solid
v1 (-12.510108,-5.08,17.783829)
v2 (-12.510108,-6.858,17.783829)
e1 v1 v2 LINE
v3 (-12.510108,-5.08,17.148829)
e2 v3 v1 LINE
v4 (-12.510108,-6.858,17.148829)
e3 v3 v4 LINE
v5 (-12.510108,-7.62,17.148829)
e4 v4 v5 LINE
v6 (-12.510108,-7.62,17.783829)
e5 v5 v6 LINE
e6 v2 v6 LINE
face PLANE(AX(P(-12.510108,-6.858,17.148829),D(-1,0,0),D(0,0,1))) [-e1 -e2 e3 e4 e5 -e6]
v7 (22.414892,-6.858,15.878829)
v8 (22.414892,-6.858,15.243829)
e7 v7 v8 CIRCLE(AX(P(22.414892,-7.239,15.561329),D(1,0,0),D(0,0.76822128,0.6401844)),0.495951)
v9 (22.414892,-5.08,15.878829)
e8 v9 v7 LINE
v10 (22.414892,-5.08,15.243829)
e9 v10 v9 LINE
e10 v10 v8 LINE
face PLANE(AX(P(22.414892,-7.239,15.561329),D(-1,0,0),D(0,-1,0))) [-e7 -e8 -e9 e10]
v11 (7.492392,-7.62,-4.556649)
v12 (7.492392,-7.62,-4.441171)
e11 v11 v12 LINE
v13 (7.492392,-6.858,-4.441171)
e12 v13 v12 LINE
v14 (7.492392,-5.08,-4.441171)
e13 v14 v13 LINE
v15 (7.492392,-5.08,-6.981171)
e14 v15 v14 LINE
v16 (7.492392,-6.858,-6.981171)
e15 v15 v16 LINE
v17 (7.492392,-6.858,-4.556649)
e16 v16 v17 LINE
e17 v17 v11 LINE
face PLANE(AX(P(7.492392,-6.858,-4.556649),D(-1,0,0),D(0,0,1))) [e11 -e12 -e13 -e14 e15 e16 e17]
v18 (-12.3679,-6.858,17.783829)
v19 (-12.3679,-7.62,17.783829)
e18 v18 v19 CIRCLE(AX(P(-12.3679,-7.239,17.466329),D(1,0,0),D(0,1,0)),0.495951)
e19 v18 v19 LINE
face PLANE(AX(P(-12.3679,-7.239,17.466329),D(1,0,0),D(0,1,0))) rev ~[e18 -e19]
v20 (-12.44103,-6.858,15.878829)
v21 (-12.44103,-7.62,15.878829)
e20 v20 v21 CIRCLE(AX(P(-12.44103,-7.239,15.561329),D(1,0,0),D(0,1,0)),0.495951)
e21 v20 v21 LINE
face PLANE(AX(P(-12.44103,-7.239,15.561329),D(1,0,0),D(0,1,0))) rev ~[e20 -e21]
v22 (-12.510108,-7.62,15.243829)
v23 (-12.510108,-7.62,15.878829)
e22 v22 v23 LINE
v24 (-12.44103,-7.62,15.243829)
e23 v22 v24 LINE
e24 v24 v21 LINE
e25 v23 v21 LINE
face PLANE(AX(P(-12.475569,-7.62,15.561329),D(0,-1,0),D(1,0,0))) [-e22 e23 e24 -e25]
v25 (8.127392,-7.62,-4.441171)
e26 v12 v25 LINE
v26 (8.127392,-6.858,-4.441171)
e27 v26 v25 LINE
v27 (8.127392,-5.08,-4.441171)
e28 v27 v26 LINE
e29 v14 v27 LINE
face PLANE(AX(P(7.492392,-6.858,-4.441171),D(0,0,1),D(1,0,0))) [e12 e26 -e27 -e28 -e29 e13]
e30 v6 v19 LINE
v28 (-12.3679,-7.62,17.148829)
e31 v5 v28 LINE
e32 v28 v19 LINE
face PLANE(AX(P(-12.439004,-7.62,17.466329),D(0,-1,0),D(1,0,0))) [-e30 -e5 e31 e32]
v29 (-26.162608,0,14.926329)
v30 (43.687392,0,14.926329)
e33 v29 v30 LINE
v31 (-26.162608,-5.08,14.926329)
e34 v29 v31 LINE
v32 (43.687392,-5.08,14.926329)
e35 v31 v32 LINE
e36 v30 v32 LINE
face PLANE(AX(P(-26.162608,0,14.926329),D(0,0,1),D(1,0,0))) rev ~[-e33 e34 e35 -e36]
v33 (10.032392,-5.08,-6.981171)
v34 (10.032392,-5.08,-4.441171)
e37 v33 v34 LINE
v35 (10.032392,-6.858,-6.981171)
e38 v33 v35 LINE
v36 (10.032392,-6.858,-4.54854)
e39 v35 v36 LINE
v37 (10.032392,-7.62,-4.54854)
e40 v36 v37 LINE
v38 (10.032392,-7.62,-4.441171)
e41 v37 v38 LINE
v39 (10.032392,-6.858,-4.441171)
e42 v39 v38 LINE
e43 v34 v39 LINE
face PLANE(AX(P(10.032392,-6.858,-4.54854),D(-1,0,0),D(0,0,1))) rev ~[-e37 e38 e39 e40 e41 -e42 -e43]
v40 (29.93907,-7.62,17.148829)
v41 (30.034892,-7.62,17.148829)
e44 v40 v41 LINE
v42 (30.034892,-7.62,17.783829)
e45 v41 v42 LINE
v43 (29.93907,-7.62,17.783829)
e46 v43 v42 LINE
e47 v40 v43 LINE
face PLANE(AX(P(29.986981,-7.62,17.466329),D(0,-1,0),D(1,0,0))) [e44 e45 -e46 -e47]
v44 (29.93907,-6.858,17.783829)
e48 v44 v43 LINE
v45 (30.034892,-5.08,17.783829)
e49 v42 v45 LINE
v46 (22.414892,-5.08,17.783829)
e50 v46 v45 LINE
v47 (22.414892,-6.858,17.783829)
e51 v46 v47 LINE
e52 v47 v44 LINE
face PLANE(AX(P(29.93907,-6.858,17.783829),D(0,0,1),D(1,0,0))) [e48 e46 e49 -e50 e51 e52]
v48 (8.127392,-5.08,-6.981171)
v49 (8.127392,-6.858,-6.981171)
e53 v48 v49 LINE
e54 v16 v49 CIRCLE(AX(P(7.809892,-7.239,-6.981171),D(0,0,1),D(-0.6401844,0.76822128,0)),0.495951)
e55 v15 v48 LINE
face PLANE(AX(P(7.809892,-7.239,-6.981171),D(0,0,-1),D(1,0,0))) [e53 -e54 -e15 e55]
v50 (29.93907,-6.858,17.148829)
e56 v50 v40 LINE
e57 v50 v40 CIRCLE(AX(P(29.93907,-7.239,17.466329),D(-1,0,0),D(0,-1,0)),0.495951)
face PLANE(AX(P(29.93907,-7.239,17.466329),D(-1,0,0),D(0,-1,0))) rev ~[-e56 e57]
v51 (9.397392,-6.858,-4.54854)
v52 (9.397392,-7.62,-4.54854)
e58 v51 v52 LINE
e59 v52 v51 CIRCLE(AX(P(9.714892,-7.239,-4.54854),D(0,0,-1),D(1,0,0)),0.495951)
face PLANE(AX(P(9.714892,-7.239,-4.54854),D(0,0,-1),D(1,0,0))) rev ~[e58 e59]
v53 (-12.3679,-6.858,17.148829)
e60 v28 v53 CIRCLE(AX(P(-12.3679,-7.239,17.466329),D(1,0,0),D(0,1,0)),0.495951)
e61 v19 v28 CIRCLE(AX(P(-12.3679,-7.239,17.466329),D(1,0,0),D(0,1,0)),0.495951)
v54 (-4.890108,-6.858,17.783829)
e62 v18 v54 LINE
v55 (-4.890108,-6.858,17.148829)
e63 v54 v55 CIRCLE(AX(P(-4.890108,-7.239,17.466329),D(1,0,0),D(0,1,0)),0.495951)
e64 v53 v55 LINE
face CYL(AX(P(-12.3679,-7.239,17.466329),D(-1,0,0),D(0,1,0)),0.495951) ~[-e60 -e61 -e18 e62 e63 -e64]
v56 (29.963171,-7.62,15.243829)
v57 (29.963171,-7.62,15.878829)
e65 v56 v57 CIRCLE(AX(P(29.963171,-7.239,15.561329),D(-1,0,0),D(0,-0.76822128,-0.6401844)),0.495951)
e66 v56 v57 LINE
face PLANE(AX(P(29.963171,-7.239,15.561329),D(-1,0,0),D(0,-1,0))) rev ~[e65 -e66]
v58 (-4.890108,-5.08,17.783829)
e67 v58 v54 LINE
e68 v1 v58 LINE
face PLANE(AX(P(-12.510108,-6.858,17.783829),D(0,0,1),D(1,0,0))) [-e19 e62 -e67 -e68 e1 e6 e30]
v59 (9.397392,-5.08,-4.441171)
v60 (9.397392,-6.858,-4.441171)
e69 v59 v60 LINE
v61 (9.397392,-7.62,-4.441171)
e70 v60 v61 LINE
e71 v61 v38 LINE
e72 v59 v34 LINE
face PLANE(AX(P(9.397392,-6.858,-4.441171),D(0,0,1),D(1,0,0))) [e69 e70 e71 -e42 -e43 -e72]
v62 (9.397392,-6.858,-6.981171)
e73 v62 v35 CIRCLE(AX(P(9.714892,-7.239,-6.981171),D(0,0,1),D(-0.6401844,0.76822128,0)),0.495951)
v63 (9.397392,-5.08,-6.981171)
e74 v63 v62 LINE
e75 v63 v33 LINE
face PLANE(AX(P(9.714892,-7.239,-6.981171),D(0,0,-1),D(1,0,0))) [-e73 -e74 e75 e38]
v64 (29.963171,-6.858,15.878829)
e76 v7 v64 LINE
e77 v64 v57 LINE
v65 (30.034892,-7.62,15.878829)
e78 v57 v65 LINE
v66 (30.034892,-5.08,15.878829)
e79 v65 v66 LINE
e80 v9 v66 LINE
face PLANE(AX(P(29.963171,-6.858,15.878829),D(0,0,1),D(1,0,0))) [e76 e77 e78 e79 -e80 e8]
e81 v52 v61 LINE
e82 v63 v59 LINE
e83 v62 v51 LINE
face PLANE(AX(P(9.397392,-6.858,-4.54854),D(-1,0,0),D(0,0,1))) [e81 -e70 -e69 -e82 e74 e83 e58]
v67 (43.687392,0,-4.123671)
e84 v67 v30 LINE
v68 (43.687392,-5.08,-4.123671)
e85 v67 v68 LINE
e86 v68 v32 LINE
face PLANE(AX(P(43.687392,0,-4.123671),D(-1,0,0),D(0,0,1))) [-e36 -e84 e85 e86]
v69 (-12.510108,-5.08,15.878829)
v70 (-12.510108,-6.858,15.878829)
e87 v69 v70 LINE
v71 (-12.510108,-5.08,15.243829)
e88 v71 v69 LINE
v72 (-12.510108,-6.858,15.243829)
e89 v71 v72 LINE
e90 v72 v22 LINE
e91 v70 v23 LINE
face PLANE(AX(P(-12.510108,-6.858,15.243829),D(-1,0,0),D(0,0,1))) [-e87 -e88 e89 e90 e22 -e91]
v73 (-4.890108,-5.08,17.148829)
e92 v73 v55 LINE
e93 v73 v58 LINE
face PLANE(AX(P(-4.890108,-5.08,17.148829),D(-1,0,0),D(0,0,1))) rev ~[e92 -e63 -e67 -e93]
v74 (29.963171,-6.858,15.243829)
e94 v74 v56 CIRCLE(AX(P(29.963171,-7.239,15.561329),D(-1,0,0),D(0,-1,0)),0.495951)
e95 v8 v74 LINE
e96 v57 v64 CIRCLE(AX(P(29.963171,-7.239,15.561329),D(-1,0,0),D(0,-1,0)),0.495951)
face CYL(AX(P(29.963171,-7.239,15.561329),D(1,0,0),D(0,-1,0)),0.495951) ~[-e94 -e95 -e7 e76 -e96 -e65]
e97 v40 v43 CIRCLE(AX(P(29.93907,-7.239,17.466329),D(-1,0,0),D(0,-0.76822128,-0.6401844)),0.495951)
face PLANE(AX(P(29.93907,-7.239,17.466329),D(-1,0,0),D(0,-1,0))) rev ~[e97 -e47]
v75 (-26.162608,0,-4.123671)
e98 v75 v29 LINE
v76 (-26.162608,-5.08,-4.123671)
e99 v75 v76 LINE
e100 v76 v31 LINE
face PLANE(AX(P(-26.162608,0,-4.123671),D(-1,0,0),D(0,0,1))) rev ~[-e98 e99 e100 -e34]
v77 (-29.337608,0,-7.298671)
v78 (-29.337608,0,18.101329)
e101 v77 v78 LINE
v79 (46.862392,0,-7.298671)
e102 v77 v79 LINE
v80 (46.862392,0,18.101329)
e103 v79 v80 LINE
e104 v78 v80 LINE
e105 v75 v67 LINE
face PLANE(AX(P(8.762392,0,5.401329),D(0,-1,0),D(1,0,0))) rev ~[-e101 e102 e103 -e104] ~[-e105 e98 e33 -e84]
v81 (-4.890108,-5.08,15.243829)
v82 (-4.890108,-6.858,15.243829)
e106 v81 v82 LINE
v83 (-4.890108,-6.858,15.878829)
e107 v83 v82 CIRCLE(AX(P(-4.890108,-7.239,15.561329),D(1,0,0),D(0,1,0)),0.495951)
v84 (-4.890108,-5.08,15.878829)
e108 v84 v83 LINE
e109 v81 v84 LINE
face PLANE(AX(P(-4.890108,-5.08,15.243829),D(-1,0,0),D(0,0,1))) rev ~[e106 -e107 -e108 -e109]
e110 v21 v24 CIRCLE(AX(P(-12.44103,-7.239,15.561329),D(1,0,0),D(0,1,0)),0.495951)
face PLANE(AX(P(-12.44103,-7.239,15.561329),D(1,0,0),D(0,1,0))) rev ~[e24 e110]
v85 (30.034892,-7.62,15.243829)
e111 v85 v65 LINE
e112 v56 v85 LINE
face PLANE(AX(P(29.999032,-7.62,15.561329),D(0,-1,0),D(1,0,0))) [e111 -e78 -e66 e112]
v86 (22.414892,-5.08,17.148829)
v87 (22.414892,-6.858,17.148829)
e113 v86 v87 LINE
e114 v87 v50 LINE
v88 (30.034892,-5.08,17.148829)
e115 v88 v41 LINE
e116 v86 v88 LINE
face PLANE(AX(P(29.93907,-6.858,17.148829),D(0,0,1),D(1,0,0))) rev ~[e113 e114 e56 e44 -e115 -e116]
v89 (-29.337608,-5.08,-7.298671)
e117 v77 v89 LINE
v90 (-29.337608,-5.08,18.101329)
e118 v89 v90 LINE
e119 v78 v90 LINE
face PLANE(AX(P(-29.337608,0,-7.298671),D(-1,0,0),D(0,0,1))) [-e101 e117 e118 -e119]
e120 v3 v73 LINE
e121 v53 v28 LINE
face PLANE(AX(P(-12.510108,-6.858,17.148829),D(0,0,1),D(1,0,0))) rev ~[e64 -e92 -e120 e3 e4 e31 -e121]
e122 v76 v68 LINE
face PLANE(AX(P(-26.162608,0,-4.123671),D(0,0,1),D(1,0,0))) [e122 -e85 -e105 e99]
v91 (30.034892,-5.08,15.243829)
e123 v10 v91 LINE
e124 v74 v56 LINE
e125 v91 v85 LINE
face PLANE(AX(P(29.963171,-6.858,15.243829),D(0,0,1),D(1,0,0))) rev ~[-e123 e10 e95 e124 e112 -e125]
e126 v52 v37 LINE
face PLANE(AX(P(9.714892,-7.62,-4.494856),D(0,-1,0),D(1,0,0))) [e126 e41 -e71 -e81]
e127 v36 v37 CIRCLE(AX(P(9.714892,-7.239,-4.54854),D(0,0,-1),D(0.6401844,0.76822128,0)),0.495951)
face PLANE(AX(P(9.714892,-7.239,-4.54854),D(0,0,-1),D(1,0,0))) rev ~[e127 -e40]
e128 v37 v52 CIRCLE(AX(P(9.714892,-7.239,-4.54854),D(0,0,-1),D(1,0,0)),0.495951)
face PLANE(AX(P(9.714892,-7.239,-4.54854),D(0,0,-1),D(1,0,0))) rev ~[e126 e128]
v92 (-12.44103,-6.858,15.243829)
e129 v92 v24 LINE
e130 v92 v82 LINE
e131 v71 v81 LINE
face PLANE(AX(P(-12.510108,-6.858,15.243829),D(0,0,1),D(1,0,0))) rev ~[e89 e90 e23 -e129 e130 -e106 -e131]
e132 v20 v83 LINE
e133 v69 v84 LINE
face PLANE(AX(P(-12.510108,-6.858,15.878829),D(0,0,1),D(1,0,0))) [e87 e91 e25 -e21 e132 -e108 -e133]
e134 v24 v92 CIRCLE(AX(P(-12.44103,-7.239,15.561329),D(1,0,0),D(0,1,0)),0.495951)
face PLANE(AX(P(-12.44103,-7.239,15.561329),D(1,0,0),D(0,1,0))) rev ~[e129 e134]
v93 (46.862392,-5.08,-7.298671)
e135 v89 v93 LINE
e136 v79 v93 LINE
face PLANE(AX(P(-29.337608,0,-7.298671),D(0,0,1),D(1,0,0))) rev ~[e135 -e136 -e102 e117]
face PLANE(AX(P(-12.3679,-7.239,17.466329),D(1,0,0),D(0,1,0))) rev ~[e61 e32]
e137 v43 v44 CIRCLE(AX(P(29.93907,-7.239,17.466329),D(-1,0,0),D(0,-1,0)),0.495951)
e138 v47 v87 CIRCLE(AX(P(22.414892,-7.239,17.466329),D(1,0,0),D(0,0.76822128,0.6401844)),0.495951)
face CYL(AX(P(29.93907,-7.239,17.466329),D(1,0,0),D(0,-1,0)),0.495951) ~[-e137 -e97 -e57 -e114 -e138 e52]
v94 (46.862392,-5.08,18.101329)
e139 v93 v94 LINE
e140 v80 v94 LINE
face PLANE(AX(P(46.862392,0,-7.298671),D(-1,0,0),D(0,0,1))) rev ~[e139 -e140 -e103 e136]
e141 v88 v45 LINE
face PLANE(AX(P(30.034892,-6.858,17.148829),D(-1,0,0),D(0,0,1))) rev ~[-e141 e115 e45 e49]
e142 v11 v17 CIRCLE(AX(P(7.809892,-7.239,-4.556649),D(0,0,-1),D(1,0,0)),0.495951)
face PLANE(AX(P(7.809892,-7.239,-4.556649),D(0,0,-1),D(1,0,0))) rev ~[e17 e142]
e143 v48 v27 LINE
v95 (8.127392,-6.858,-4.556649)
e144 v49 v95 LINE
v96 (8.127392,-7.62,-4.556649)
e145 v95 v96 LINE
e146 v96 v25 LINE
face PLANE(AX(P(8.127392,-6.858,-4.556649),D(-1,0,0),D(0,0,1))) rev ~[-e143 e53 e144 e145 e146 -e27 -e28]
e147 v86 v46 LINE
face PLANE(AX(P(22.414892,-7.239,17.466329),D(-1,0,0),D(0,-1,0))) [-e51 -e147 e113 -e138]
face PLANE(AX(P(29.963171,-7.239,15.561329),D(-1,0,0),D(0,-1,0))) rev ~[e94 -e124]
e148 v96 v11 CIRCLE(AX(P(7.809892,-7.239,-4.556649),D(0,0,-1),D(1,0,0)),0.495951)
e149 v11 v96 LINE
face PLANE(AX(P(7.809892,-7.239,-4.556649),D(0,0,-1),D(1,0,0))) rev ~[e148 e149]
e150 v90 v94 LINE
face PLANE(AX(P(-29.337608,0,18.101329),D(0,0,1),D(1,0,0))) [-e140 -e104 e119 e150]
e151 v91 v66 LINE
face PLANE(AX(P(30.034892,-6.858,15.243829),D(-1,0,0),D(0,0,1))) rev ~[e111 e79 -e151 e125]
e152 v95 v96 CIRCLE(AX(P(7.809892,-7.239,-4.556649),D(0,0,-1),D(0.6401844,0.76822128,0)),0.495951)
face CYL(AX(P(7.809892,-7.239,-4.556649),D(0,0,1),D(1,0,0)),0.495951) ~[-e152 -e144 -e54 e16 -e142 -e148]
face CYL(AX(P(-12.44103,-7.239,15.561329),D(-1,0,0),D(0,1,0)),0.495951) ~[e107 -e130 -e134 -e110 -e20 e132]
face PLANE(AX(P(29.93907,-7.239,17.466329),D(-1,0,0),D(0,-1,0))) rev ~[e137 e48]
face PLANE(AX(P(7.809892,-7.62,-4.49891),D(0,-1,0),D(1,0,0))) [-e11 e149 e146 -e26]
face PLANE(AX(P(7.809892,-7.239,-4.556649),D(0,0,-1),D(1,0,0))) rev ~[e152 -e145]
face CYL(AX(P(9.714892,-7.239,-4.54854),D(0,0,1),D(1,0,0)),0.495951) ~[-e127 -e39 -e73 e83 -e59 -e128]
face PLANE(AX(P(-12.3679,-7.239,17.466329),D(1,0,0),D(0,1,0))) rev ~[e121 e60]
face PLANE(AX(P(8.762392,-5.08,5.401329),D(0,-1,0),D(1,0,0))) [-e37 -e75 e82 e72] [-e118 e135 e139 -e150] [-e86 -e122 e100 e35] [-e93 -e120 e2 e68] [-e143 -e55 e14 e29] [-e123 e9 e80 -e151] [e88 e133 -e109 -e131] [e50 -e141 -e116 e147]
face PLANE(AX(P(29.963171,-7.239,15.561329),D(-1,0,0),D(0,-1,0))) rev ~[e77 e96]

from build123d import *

# Parameters (mm, degrees)
F0_W      = 76.2
F0_H      = 25.4
F0_W_2    = 69.85
F0_H_2    = 19.05
F1_DEPTH  = 5.08
F2_W      = 7.62
F2_H      = 0.635
F3_DEPTH  = 1.778
F4_W      = 0.635
F4_H      = 2.54
F5_DEPTH  = 1.778
F6_W      = 0.1422071991
F6_H      = 0.635
F7_DEPTH  = 0.762
F8_R      = 0.4959508544
F9_DEPTH  = 7.4777928009
F10_W     = 0.0690778879
F10_H     = 0.635
F11_DEPTH = 0.762
F12_R     = 0.4959508544
F13_DEPTH = 7.5509221121
F14_W     = 0.095821996
F14_H     = 0.635
F15_DEPTH = 0.762
F16_R     = 0.4959508544
F17_DEPTH = 7.524178004
F18_W     = 0.0717212304
F18_H     = 0.635
F19_DEPTH = 0.762
F20_R     = 0.4959508544
F21_DEPTH = 7.5482787696
F22_W     = 0.635
F22_H     = 0.1154780363
F23_DEPTH = 0.762
F24_R     = 0.4959508544
F25_DEPTH = 2.4245219637
F26_W     = 0.635
F26_H     = 0.1073694763
F27_DEPTH = 0.762
F28_R     = 0.4959508544
F29_DEPTH = 2.4326305237


with BuildPart() as f1:
    # F0 (on Front) → F1 (new body)
    with BuildSketch(Plane.XZ):
        with Locations((8.76239234, 5.4013291374)):
            Rectangle(F0_W, F0_H)
        with Locations((8.76239234, 5.4013291374)):
            Rectangle(F0_W_2, F0_H_2, mode=Mode.SUBTRACT)
    extrude(amount=F1_DEPTH)

    # F2 (on face) → F3 (join)
    with BuildSketch(Plane.XZ.offset(5.08)):
        with Locations((26.22489234, 17.4663291374)):
            Rectangle(F2_W, F2_H)
        with Locations((26.22489234, 15.5613291374)):
            Rectangle(F2_W, F2_H)
        with Locations((-8.70010766, 17.4663291374)):
            Rectangle(F2_W, F2_H)
        with Locations((-8.70010766, 15.5613291374)):
            Rectangle(F2_W, F2_H)
    extrude(amount=F3_DEPTH)

    # F4 (on face) → F5 (join)
    with BuildSketch(Plane.XZ.offset(5.08)):
        with Locations((9.71489234, -5.7111708626)):
            Rectangle(F4_W, F4_H)
        with Locations((7.80989234, -5.7111708626)):
            Rectangle(F4_W, F4_H)
    extrude(amount=F5_DEPTH)

    # F6 (on face) → F7 (join)
    with BuildSketch(Plane.XZ.offset(6.858)):
        with Locations((-12.4390040605, 17.4663291374)):
            Rectangle(F6_W, F6_H)
    extrude(amount=F7_DEPTH)

    # F8 (on face) → F9 (join, through all)
    with BuildSketch(Plane.YZ.offset(-12.367900461)):
        with Locations((-7.239, 17.4663291374)):
            Circle(F8_R)
    extrude(amount=F9_DEPTH)

    # F10 (on face) → F11 (join)
    with BuildSketch(Plane.XZ.offset(6.858)):
        with Locations((-12.4755687161, 15.5613291374)):
            Rectangle(F10_W, F10_H)
    extrude(amount=F11_DEPTH)

    # F12 (on face) → F13 (join, through all)
    with BuildSketch(Plane.YZ.offset(-12.4410297722)):
        with Locations((-7.239, 15.5613291374)):
            Circle(F12_R)
    extrude(amount=F13_DEPTH)

    # F14 (on face) → F15 (join)
    with BuildSketch(Plane.XZ.offset(6.858)):
        with Locations((29.986981342, 17.4663291374)):
            Rectangle(F14_W, F14_H)
    extrude(amount=F15_DEPTH)

    # F16 (on face) → F17 (join, through all)
    with BuildSketch(Plane(origin=(29.939070344, 0, 0), x_dir=(0, -1, 0), z_dir=(-1, 0, 0))):
        with Locations((7.239, 17.4663291374)):
            Circle(F16_R)
    extrude(amount=F17_DEPTH)

    # F18 (on face) → F19 (join)
    with BuildSketch(Plane.XZ.offset(6.858)):
        with Locations((29.9990317248, 15.5613291374)):
            Rectangle(F18_W, F18_H)
    extrude(amount=F19_DEPTH)

    # F20 (on face) → F21 (join, through all)
    with BuildSketch(Plane(origin=(29.9631711096, 0, 0), x_dir=(0, -1, 0), z_dir=(-1, 0, 0))):
        with Locations((7.239, 15.5613291374)):
            Circle(F20_R)
    extrude(amount=F21_DEPTH)

    # F22 (on face) → F23 (join)
    with BuildSketch(Plane.XZ.offset(6.858)):
        with Locations((7.80989234, -4.4989098807)):
            Rectangle(F22_W, F22_H)
    extrude(amount=F23_DEPTH)

    # F24 (on face) → F25 (join, through all)
    with BuildSketch(Plane(origin=(0, 0, -4.5566488989), x_dir=(1, 0, 0), z_dir=(0, 0, -1))):
        with Locations((7.80989234, 7.239)):
            Circle(F24_R)
    extrude(amount=F25_DEPTH)

    # F26 (on face) → F27 (join)
    with BuildSketch(Plane.XZ.offset(6.858)):
        with Locations((9.71489234, -4.4948556007)):
            Rectangle(F26_W, F26_H)
    extrude(amount=F27_DEPTH)

    # F28 (on face) → F29 (join, through all)
    with BuildSketch(Plane(origin=(0, 0, -4.5485403389), x_dir=(1, 0, 0), z_dir=(0, 0, -1))):
        with Locations((9.71489234, 7.239)):
            Circle(F28_R)
    extrude(amount=F29_DEPTH)


solid = f1.part
